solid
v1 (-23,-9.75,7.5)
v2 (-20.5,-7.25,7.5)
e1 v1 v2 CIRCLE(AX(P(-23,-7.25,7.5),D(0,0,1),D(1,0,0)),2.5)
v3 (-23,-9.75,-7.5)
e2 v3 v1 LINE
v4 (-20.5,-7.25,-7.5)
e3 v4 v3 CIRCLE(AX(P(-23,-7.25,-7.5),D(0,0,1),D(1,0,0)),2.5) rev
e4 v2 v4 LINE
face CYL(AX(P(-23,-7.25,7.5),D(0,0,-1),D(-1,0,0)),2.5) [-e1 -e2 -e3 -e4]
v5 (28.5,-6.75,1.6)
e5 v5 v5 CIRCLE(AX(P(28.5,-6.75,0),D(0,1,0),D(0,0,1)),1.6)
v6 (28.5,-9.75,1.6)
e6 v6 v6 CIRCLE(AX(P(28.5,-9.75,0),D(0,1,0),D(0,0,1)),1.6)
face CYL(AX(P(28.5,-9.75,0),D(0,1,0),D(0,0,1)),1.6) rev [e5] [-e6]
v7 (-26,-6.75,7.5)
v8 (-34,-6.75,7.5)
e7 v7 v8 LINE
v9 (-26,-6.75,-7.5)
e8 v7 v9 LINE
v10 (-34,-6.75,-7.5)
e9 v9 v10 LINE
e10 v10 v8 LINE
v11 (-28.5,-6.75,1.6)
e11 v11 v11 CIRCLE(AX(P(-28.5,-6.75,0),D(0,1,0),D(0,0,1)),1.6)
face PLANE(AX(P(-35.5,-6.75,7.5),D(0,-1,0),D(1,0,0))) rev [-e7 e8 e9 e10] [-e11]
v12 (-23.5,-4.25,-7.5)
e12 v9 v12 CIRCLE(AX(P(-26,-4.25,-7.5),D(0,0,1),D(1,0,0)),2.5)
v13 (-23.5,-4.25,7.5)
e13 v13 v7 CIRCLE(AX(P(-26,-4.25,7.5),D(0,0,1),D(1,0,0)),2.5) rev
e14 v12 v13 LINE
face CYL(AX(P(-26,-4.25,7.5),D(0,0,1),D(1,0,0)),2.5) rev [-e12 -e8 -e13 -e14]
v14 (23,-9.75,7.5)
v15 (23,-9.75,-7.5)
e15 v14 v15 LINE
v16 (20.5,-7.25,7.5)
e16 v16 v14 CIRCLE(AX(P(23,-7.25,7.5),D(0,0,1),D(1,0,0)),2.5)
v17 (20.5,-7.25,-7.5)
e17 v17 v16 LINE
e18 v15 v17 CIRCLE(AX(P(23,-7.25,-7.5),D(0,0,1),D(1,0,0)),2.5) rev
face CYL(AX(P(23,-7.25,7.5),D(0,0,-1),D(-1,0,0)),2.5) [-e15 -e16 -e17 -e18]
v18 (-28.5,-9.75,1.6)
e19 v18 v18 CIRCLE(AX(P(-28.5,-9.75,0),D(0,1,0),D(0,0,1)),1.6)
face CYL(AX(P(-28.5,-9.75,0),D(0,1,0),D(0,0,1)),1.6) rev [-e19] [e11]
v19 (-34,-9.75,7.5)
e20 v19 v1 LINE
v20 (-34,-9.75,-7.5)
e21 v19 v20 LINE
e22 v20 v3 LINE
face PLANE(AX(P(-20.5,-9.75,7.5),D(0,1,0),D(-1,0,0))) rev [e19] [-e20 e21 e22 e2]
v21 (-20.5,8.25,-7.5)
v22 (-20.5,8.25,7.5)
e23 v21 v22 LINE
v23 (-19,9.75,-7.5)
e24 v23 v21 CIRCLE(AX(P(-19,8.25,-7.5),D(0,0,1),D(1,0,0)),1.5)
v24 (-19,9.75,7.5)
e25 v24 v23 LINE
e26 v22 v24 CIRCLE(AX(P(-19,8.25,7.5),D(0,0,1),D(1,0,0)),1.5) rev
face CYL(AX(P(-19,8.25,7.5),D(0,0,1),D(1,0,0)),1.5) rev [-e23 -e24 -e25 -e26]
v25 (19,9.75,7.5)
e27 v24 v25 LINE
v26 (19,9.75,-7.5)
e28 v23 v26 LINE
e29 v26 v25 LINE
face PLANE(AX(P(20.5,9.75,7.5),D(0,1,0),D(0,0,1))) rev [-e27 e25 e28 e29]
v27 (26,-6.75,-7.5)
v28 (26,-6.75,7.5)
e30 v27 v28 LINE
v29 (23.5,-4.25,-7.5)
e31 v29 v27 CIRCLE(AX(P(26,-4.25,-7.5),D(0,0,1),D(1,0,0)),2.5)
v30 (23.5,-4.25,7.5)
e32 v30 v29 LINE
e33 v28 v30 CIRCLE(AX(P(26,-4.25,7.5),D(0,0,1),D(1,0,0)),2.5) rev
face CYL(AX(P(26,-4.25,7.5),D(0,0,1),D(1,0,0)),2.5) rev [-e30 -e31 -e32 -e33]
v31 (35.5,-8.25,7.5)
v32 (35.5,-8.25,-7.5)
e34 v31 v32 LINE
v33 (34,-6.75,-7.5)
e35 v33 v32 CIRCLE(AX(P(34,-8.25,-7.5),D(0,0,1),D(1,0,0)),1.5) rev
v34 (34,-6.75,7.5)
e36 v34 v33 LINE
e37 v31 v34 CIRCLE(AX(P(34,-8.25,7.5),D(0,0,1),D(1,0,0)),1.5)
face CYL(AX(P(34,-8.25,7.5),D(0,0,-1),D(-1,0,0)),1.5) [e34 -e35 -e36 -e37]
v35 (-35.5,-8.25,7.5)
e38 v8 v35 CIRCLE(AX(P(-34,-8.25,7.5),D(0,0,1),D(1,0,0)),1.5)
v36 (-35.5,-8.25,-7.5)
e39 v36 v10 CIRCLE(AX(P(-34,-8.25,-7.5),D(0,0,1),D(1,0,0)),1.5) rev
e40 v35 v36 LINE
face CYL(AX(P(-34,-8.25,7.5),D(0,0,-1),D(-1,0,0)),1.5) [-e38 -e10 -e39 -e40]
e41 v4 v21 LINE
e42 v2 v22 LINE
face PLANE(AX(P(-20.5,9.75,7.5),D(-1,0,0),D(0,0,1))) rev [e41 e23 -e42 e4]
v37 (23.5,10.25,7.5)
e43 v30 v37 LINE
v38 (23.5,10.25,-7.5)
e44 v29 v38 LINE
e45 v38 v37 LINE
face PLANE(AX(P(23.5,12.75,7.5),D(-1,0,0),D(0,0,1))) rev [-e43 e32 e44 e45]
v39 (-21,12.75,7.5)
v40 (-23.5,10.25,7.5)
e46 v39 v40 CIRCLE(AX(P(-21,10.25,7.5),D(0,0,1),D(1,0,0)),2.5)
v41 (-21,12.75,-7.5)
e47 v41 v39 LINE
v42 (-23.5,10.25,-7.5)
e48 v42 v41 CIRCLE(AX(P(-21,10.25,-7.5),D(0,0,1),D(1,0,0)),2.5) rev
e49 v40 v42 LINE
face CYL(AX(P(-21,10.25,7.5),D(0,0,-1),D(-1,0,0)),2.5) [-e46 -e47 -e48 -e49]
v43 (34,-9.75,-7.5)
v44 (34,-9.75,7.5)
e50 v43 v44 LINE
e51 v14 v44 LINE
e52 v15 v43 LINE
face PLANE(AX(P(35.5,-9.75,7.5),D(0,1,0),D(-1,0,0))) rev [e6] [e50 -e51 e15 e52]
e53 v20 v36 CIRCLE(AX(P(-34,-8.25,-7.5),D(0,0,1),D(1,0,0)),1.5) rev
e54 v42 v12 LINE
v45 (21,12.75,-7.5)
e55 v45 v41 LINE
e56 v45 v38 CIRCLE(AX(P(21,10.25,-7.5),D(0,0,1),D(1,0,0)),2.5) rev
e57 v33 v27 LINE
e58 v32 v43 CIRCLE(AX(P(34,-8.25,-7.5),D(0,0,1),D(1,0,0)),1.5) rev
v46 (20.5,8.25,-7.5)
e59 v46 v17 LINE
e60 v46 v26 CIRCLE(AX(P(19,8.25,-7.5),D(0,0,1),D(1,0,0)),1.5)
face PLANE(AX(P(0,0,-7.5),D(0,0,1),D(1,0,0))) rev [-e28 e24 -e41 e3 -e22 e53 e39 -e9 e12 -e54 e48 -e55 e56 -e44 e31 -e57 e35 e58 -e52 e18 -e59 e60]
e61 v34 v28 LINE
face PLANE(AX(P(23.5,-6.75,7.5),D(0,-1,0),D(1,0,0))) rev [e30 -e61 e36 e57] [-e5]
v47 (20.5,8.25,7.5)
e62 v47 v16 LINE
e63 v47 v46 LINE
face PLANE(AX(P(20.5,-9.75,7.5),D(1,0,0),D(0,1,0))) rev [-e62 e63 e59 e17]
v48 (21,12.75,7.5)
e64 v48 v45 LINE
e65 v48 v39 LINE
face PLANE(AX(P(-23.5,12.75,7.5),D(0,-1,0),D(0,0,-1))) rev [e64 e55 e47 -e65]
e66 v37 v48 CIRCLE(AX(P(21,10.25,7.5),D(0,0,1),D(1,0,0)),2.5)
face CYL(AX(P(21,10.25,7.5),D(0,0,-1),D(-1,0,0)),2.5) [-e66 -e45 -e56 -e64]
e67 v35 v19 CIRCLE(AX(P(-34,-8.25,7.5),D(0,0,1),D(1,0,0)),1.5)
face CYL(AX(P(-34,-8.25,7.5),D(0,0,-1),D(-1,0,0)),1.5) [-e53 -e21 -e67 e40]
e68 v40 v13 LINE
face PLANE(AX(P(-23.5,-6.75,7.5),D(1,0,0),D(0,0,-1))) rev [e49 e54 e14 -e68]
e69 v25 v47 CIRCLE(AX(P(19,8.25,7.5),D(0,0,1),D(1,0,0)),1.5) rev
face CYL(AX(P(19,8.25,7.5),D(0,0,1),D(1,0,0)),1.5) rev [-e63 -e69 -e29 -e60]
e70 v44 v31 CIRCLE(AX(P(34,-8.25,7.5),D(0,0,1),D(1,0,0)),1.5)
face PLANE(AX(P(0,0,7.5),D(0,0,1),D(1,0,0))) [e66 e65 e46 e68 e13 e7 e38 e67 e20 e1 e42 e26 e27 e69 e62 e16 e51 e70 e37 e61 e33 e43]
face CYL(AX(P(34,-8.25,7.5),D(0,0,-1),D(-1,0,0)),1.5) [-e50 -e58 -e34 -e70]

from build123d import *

# Parameters (mm, degrees)
BOSS_EXTRUDE1_DEPTH = 7.5
SKETCH2_R           = 1.6
CUT_EXTRUDE2_DEPTH  = 42.191625362
FILLET1_R           = 2.5
FILLET2_R           = 1.5


with BuildPart() as part:
    # Sketch1 → Boss-Extrude1 (new, symmetric)
    with BuildSketch(Plane.XY):
        Polygon((-23.5, 12.75), (23.5, 12.75), (23.5, -6.75), (35.5, -6.75), (35.5, -9.75), (20.5, -9.75), (20.5, 9.75), (-20.5, 9.75), (-20.5, -9.75), (-35.5, -9.75), (-35.5, -6.75), (-23.5, -6.75), align=None)
    extrude(amount=BOSS_EXTRUDE1_DEPTH, both=True)

    # Sketch2 → Cut-Extrude2 (cut, through all)
    with BuildSketch(Plane(origin=(0, -6.75, 0), x_dir=(1, 0, 0), z_dir=(0, 1, 0))):
        with Locations(Location((-28.5, 0, 0), (0, 0, 270))):
            Circle(SKETCH2_R)
        with Locations(Location((28.5, 0, 0), (0, 0, 270))):
            Circle(SKETCH2_R)
    extrude(amount=-CUT_EXTRUDE2_DEPTH, mode=Mode.SUBTRACT)

    # Fillet1
    fillet1_edges = [part.edges().sort_by_distance(p)[0] for p in [
        (23.5, -6.75, 0),
        (20.5, -9.75, 0),
        (-20.5, -9.75, 0),
        (-23.5, -6.75, 0),
        (-23.5, 12.75, 0),
        (23.5, 12.75, 0),
    ]]
    fillet(fillet1_edges, radius=FILLET1_R)

    # Fillet2
    fillet2_edges = [part.edges().sort_by_distance(p)[0] for p in [
        (35.5, -6.75, 0),
        (35.5, -9.75, 0),
        (20.5, 9.75, 0),
        (-20.5, 9.75, 0),
        (-35.5, -9.75, 0),
        (-35.5, -6.75, 0),
    ]]
    fillet(fillet2_edges, radius=FILLET2_R - 0.0001)  # a hair under: the kernel refuses the full size


solid = part.part
